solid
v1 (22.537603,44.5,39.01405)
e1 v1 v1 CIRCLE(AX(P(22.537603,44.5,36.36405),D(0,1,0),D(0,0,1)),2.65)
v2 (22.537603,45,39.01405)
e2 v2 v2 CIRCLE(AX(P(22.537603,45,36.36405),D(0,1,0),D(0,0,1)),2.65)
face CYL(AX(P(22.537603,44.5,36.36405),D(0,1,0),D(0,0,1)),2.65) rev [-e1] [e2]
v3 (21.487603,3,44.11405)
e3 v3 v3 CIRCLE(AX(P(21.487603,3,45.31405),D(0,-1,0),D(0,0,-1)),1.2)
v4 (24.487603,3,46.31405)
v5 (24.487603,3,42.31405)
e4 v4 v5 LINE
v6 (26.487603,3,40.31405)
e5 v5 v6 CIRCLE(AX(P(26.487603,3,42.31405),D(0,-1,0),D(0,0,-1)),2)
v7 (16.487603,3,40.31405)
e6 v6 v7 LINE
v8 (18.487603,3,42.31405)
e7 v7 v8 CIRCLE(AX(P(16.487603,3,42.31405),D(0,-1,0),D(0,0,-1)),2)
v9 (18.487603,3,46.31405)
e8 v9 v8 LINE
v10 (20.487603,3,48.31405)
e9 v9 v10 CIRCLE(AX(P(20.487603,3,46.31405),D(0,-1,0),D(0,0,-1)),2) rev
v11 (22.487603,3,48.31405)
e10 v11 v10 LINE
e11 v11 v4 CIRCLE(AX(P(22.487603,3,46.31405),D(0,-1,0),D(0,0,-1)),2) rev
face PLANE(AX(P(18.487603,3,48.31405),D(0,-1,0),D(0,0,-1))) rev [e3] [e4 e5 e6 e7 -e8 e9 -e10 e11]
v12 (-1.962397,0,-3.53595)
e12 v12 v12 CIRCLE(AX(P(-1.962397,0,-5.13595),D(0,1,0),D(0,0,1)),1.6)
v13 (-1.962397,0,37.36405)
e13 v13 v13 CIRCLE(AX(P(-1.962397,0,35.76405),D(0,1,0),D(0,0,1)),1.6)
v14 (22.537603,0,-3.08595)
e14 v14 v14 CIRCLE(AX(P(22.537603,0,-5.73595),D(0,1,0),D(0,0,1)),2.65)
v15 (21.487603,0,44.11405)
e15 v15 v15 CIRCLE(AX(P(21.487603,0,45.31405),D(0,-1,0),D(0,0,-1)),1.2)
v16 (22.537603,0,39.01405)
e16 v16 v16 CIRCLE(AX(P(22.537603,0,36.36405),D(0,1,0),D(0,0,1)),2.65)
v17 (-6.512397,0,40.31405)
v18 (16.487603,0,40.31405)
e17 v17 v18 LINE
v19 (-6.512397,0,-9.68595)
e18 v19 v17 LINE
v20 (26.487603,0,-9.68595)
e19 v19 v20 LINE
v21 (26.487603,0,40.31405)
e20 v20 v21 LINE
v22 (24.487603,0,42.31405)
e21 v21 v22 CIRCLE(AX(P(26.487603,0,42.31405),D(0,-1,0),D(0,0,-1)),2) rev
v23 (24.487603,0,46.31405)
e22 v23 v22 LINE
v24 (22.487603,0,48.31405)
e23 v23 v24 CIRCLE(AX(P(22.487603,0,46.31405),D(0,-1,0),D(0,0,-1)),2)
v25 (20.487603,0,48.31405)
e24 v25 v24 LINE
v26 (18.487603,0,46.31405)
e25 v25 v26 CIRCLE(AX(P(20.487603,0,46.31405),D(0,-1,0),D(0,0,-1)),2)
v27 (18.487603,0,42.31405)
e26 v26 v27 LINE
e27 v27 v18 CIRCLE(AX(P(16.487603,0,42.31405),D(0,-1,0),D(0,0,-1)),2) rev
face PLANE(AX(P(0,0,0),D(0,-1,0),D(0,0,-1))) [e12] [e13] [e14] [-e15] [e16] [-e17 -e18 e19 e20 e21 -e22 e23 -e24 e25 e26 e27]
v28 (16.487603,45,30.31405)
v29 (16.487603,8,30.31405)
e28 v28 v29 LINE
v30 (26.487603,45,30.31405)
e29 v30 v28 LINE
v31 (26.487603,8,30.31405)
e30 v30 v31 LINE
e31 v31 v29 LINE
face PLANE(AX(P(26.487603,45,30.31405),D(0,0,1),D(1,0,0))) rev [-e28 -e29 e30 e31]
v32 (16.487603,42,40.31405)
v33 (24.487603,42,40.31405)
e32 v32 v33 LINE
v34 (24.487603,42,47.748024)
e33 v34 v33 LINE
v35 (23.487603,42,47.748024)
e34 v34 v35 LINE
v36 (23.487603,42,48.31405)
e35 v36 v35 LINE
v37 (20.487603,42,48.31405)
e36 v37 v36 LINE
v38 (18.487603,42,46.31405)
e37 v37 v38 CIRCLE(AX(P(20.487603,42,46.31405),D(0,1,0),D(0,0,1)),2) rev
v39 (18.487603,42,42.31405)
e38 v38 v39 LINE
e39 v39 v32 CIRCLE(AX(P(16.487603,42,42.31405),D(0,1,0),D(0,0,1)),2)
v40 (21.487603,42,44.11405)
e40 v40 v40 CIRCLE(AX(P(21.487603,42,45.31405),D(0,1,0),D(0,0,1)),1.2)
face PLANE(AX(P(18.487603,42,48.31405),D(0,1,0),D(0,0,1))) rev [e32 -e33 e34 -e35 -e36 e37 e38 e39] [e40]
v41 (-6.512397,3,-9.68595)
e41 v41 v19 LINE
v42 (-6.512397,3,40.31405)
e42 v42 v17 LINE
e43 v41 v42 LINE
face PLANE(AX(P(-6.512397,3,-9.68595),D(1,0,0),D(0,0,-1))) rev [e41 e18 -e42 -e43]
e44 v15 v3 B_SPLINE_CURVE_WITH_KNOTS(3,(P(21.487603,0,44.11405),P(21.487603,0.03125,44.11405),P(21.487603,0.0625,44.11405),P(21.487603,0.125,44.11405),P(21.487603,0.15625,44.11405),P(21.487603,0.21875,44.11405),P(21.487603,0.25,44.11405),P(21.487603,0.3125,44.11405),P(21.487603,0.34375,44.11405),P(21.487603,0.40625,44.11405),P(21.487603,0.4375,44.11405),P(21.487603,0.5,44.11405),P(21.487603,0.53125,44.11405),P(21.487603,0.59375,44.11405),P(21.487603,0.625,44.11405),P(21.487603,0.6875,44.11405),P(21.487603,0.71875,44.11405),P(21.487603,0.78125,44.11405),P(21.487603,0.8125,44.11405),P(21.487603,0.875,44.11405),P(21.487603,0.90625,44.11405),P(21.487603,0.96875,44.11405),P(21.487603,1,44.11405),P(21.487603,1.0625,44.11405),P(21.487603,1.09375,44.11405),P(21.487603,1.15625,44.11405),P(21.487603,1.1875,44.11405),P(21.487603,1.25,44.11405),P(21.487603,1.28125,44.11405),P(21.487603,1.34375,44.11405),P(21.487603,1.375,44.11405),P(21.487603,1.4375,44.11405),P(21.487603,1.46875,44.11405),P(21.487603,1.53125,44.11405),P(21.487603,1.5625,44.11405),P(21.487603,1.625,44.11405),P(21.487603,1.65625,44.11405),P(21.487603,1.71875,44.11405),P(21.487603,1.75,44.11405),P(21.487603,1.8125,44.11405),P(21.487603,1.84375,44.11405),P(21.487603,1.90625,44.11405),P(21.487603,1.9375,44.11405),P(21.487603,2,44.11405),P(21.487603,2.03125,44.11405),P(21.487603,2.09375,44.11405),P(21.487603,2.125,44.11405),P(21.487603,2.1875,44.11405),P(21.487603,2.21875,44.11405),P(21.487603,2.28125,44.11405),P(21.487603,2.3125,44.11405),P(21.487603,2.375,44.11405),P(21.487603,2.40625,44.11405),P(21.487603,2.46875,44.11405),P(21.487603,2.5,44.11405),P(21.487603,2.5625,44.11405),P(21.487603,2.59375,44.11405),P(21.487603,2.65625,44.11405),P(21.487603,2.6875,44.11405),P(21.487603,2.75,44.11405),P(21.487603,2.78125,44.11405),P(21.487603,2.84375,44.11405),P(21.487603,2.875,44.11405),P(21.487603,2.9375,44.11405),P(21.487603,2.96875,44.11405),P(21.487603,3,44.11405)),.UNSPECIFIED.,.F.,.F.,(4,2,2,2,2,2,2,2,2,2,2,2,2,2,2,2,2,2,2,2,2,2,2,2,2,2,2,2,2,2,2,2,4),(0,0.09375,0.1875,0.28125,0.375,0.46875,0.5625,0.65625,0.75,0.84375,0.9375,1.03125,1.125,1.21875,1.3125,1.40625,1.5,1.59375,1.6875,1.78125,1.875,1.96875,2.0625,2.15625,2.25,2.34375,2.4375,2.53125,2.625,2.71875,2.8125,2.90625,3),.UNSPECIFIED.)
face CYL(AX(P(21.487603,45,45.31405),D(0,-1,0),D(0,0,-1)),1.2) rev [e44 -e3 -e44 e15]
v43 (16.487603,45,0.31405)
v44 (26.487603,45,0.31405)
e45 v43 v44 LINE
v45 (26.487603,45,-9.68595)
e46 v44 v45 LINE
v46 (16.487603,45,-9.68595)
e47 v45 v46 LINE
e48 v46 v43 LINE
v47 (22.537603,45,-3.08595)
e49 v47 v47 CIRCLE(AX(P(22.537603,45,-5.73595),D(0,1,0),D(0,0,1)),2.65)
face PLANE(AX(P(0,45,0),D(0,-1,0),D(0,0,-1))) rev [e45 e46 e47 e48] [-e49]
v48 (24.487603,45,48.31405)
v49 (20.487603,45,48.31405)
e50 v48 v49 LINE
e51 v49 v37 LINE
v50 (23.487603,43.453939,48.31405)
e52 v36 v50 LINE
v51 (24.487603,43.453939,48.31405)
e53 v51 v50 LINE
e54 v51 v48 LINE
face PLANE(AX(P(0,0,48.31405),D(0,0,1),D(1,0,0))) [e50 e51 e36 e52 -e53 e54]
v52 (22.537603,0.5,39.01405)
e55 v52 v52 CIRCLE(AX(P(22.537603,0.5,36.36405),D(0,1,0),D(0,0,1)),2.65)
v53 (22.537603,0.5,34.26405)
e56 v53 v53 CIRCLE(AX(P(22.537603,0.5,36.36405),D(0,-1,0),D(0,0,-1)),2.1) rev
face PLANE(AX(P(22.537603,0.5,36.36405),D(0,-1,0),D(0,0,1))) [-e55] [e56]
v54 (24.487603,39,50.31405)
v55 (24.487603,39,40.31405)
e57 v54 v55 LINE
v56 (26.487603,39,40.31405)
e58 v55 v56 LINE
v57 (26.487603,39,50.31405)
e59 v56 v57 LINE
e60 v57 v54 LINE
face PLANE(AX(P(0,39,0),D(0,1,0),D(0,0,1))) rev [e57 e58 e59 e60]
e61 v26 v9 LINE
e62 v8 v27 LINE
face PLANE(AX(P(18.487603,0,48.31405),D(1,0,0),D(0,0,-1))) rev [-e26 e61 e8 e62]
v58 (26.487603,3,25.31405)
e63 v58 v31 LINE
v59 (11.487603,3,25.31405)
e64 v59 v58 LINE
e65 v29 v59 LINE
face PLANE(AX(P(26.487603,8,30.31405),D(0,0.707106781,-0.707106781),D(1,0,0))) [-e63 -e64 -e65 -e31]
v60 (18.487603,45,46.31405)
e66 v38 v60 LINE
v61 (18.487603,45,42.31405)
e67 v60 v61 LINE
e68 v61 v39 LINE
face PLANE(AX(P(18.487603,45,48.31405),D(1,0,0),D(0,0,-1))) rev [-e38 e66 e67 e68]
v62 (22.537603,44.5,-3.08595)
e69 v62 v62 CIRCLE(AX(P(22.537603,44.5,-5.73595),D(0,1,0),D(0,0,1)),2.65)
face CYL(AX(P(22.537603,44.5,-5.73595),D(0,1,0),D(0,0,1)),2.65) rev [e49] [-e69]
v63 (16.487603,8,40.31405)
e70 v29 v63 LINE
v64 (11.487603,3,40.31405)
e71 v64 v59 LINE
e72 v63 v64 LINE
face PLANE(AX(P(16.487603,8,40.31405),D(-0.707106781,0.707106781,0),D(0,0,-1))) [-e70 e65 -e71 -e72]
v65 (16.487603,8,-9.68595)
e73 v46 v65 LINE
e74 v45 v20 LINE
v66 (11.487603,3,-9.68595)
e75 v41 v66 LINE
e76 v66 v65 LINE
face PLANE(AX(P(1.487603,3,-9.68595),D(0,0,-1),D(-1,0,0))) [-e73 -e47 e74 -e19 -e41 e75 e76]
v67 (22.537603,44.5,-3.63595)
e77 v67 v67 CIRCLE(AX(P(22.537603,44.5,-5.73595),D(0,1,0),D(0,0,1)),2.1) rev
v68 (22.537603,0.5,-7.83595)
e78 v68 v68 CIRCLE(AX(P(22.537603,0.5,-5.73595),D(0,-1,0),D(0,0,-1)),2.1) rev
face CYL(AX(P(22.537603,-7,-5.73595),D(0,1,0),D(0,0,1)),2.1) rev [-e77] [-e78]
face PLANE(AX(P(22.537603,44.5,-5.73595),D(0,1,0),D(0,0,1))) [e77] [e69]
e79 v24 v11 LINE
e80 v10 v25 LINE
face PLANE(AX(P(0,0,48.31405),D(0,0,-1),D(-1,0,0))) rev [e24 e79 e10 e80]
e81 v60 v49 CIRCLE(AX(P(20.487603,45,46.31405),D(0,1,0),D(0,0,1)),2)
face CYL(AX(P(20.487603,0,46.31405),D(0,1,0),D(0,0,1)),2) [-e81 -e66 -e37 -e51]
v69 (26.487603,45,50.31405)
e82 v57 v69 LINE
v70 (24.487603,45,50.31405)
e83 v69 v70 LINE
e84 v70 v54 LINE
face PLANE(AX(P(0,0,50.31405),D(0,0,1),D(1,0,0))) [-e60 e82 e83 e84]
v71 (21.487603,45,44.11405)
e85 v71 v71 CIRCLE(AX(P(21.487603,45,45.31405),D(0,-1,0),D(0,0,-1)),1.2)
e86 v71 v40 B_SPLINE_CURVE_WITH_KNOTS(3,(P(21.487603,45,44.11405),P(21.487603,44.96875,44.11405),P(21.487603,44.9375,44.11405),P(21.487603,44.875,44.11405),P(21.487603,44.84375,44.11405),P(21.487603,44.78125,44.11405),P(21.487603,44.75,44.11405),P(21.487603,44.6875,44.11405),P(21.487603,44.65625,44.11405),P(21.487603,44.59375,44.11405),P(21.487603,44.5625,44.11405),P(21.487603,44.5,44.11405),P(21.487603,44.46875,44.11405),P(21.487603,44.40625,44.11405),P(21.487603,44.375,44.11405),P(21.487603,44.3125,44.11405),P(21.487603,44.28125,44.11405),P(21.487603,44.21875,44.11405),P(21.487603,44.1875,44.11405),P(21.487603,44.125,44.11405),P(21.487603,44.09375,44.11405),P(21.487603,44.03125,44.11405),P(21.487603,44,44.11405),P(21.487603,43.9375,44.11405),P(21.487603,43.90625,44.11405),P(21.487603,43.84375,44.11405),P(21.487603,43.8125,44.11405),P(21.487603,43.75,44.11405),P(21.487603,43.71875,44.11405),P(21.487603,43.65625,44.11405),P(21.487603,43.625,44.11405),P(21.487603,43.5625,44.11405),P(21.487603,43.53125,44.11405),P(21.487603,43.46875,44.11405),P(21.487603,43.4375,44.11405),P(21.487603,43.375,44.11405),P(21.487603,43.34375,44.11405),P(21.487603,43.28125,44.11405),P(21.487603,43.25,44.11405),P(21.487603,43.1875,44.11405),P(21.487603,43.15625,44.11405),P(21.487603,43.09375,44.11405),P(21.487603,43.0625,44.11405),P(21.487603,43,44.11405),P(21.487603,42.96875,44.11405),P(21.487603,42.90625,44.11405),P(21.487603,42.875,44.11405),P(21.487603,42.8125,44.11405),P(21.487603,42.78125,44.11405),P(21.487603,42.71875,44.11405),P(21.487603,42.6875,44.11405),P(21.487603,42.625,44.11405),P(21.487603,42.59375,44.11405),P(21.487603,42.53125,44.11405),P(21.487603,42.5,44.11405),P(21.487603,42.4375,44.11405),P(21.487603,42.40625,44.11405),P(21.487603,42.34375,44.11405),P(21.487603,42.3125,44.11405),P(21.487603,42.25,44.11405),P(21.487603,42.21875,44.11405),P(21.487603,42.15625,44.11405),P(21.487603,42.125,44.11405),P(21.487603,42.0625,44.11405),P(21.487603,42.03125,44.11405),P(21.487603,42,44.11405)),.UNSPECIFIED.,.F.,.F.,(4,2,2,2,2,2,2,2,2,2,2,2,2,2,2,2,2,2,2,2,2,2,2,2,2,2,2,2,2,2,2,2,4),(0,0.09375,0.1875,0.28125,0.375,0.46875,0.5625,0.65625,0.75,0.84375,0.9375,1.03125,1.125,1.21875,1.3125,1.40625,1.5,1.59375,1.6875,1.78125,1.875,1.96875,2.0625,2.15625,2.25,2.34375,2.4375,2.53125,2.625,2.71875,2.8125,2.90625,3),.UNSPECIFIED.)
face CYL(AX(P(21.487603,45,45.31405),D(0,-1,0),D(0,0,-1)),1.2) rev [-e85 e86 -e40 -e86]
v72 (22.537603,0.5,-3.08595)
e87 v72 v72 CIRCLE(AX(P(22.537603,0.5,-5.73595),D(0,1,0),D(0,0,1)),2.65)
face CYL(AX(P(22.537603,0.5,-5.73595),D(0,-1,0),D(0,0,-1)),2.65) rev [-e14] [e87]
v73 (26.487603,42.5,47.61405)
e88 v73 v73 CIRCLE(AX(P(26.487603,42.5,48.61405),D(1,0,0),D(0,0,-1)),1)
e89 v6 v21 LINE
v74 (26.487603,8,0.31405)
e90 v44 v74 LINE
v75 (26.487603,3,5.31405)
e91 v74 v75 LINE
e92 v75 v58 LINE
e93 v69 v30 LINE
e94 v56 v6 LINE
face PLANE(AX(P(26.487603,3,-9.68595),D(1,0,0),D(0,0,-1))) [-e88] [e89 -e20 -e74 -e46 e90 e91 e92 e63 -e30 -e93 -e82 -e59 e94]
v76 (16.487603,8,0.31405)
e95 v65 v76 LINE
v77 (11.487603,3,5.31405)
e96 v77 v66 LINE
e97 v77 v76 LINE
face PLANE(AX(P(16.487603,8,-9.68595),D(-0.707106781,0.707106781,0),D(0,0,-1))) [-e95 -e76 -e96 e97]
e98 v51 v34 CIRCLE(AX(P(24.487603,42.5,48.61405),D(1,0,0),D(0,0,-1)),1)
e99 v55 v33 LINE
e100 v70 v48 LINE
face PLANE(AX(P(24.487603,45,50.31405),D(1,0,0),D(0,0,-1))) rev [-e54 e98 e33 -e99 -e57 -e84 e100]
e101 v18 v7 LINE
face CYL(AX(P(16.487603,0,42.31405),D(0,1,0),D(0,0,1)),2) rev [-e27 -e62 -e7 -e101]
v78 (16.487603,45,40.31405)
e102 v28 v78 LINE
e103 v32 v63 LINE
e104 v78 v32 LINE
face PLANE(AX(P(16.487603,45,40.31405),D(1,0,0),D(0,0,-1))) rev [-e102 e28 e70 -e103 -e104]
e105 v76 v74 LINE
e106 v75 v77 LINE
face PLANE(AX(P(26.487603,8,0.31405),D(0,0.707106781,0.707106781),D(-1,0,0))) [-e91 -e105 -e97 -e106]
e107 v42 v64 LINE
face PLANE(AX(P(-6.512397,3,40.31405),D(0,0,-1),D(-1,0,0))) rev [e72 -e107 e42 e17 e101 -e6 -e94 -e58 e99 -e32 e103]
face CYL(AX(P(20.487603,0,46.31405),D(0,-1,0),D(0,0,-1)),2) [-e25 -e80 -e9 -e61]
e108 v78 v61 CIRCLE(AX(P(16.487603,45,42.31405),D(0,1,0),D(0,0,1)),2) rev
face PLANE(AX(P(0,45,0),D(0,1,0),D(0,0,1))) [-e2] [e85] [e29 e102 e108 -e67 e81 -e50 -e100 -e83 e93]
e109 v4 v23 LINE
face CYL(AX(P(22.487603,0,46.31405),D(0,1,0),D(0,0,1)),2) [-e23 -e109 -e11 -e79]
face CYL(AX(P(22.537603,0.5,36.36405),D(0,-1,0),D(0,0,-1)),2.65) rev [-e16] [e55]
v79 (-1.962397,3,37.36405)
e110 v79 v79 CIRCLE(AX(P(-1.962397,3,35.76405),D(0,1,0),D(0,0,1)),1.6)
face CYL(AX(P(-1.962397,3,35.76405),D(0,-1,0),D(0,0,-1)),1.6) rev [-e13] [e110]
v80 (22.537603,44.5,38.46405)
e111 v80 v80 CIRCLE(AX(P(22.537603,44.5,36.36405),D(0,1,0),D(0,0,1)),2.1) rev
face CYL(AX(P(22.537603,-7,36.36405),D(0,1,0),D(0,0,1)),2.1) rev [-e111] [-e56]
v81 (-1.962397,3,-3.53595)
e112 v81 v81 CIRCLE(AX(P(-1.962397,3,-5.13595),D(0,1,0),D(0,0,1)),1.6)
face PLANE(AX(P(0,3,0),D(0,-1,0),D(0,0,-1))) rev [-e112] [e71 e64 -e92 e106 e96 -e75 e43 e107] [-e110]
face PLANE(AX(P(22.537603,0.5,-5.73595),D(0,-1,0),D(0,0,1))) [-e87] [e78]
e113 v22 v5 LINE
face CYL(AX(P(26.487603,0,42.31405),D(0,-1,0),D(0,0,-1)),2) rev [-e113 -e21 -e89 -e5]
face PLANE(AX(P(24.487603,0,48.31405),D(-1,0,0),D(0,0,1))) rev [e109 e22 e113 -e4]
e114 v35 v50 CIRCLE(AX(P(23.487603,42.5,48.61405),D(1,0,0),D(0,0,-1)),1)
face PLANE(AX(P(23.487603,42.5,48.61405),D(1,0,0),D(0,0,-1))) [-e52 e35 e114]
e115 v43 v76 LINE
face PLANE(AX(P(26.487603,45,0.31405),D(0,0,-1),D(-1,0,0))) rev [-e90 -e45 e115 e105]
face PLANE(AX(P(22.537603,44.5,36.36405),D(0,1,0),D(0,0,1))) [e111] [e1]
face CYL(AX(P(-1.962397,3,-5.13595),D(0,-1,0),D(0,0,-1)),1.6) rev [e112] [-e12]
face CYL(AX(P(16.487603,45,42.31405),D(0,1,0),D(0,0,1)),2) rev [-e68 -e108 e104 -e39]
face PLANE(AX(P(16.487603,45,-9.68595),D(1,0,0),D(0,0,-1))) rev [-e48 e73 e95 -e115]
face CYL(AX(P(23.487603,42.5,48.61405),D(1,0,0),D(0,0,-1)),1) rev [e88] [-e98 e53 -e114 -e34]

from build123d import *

# Parameters (mm, degrees)
SKETCH1_R           = 1.6
BOSS_EXTRUDE1_DEPTH = 3
SKETCH2_W           = 10
SKETCH2_H           = 10
BOSS_EXTRUDE2_DEPTH = 42
CHAMFER1_SIZE       = 5
SKETCH3_R           = 2.1
CUT_EXTRUDE1_DEPTH  = 52
SKETCH4_R           = 2.65
CUT_EXTRUDE2_DEPTH  = 0.5
SKETCH11_W          = 6
SKETCH11_H          = 3
BOSS_EXTRUDE7_DEPTH = 8
SKETCH12_R          = 1.2
CUT_EXTRUDE5_DEPTH  = 72.139584736
FILLET1_R           = 2
SKETCH13_W          = 2
SKETCH13_H          = 3
BOSS_EXTRUDE8_DEPTH = 10
SKETCH14_W          = 2
SKETCH14_H          = 10
BOSS_EXTRUDE9_DEPTH = 3
SKETCH15_R          = 1
CUT_EXTRUDE6_DEPTH  = 3


with BuildPart() as part:
    # Sketch1 → Boss-Extrude1 (new body)
    with BuildSketch(Plane(origin=(0, 0, 0), x_dir=(1, 0, 0), z_dir=(0, 1, 0))):
        Polygon((-6.512396694, 9.685950413), (1.487603306, 9.685950413), (26.487603306, 9.685950413), (26.487603306, -40.314049587), (1.487603306, -40.314049587), (-6.512396694, -40.314049587), align=None)
        with Locations(Location((-1.962396694, -35.764049587, 0), (0, 0, 270))):
            Circle(SKETCH1_R, mode=Mode.SUBTRACT)
        with Locations(Location((-1.962396694, 5.135950413, 0), (0, 0, 270))):
            Circle(SKETCH1_R, mode=Mode.SUBTRACT)
    extrude(amount=BOSS_EXTRUDE1_DEPTH)

    # Sketch2 → Boss-Extrude2 (add)
    with BuildSketch(Plane(origin=(0, 3, 0), x_dir=(1, 0, 0), z_dir=(0, 1, 0))):
        with Locations((21.487603306, -35.314049587)):
            Rectangle(SKETCH2_W, SKETCH2_H)
        with Locations((21.487603306, 4.685950413)):
            Rectangle(SKETCH2_W, SKETCH2_H)
    extrude(amount=BOSS_EXTRUDE2_DEPTH)

    # Chamfer1
    chamfer1_edges = [part.edges().sort_by_distance(p)[0] for p in [
        (21.487603306, 3, 30.314049587),
        (16.487603306, 3, 35.314049587),
        (16.487603306, 3, -4.685950413),
        (21.487603306, 3, 0.314049587),
    ]]
    chamfer(chamfer1_edges, length=CHAMFER1_SIZE)

    # Sketch3 → Cut-Extrude1 (cut)
    with BuildSketch(Plane(origin=(0, 45, 0), x_dir=(1, 0, 0), z_dir=(0, 1, 0))):
        with Locations(Location((22.537603306, -36.364049587, 0), (0, 0, 270))):
            Circle(SKETCH3_R)
        with Locations(Location((22.537603306, 5.735950413, 0), (0, 0, 270))):
            Circle(SKETCH3_R)
    extrude(amount=-CUT_EXTRUDE1_DEPTH, mode=Mode.SUBTRACT)

    # Sketch4 → Cut-Extrude2 (cut)
    with BuildSketch(Plane(origin=(0, 45, 0), x_dir=(1, 0, 0), z_dir=(0, 1, 0))):
        with Locations(Location((22.537603306, -36.364049587, 0), (0, 0, 270))):
            Circle(SKETCH4_R)
        with Locations(Location((22.537603306, 5.735950413, 0), (0, 0, 270))):
            Circle(SKETCH4_R)
    cut_extrude2 = extrude(amount=-CUT_EXTRUDE2_DEPTH, mode=Mode.SUBTRACT)

    # Mirror1: Cut-Extrude2 across plane
    add(cut_extrude2.mirror(Plane(origin=(0, 22.5, 0), x_dir=(0, 0, 1), z_dir=(0, -1, 0))), mode=Mode.SUBTRACT)

    # Sketch11 → Boss-Extrude7 (add)
    with BuildSketch(Plane.XY.offset(40.314049587)):
        with Locations((21.487603306, 43.5)):
            Rectangle(SKETCH11_W, SKETCH11_H)
        with Locations((21.487603306, 1.5)):
            Rectangle(SKETCH11_W, SKETCH11_H)
    extrude(amount=BOSS_EXTRUDE7_DEPTH)

    # Sketch12 → Cut-Extrude5 (cut, through all)
    with BuildSketch(Plane.XZ):
        with Locations(Location((21.487603306, 45.314049587, 0), (0, 0, 270))):
            Circle(SKETCH12_R)
    extrude(amount=-CUT_EXTRUDE5_DEPTH, mode=Mode.SUBTRACT)

    # Fillet1
    fillet1_edges = [part.edges().sort_by_distance(p)[0] for p in [
        (18.487603306, 43.5, 40.314049587),
        (18.487603306, 1.5, 40.314049587),
        (24.487603306, 1.5, 40.314049587),
    ]]
    fillet(fillet1_edges, radius=FILLET1_R - 0.0001)  # a hair under: the kernel refuses the full size
    fillet1_2_edges = [part.edges().sort_by_distance(p)[0] for p in [
        (18.487603306, 43.5, 48.314049587),
        (24.487603306, 1.5, 48.314049587),
        (18.487603306, 1.5, 48.314049587),
    ]]
    fillet(fillet1_2_edges, radius=FILLET1_R)

    # Sketch13 → Boss-Extrude8 (add)
    with BuildSketch(Plane.XY.offset(40.314049587)):
        with Locations((25.487603306, 43.5)):
            Rectangle(SKETCH13_W, SKETCH13_H)
    extrude(amount=BOSS_EXTRUDE8_DEPTH)

    # Sketch14 → Boss-Extrude9 (add)
    with BuildSketch(Plane.XZ.offset(-42)):
        with Locations((25.487603306, 45.314049587)):
            Rectangle(SKETCH14_W, SKETCH14_H)
    extrude(amount=BOSS_EXTRUDE9_DEPTH)

    # Sketch15 → Cut-Extrude6 (cut)
    with BuildSketch(Plane(origin=(26.487603306, 0, 0), x_dir=(0, 0, -1), z_dir=(1, 0, 0))):
        with Locations((-48.614049587, 42.5)):
            Circle(SKETCH15_R)
    extrude(amount=-CUT_EXTRUDE6_DEPTH, mode=Mode.SUBTRACT)


solid = part.part
